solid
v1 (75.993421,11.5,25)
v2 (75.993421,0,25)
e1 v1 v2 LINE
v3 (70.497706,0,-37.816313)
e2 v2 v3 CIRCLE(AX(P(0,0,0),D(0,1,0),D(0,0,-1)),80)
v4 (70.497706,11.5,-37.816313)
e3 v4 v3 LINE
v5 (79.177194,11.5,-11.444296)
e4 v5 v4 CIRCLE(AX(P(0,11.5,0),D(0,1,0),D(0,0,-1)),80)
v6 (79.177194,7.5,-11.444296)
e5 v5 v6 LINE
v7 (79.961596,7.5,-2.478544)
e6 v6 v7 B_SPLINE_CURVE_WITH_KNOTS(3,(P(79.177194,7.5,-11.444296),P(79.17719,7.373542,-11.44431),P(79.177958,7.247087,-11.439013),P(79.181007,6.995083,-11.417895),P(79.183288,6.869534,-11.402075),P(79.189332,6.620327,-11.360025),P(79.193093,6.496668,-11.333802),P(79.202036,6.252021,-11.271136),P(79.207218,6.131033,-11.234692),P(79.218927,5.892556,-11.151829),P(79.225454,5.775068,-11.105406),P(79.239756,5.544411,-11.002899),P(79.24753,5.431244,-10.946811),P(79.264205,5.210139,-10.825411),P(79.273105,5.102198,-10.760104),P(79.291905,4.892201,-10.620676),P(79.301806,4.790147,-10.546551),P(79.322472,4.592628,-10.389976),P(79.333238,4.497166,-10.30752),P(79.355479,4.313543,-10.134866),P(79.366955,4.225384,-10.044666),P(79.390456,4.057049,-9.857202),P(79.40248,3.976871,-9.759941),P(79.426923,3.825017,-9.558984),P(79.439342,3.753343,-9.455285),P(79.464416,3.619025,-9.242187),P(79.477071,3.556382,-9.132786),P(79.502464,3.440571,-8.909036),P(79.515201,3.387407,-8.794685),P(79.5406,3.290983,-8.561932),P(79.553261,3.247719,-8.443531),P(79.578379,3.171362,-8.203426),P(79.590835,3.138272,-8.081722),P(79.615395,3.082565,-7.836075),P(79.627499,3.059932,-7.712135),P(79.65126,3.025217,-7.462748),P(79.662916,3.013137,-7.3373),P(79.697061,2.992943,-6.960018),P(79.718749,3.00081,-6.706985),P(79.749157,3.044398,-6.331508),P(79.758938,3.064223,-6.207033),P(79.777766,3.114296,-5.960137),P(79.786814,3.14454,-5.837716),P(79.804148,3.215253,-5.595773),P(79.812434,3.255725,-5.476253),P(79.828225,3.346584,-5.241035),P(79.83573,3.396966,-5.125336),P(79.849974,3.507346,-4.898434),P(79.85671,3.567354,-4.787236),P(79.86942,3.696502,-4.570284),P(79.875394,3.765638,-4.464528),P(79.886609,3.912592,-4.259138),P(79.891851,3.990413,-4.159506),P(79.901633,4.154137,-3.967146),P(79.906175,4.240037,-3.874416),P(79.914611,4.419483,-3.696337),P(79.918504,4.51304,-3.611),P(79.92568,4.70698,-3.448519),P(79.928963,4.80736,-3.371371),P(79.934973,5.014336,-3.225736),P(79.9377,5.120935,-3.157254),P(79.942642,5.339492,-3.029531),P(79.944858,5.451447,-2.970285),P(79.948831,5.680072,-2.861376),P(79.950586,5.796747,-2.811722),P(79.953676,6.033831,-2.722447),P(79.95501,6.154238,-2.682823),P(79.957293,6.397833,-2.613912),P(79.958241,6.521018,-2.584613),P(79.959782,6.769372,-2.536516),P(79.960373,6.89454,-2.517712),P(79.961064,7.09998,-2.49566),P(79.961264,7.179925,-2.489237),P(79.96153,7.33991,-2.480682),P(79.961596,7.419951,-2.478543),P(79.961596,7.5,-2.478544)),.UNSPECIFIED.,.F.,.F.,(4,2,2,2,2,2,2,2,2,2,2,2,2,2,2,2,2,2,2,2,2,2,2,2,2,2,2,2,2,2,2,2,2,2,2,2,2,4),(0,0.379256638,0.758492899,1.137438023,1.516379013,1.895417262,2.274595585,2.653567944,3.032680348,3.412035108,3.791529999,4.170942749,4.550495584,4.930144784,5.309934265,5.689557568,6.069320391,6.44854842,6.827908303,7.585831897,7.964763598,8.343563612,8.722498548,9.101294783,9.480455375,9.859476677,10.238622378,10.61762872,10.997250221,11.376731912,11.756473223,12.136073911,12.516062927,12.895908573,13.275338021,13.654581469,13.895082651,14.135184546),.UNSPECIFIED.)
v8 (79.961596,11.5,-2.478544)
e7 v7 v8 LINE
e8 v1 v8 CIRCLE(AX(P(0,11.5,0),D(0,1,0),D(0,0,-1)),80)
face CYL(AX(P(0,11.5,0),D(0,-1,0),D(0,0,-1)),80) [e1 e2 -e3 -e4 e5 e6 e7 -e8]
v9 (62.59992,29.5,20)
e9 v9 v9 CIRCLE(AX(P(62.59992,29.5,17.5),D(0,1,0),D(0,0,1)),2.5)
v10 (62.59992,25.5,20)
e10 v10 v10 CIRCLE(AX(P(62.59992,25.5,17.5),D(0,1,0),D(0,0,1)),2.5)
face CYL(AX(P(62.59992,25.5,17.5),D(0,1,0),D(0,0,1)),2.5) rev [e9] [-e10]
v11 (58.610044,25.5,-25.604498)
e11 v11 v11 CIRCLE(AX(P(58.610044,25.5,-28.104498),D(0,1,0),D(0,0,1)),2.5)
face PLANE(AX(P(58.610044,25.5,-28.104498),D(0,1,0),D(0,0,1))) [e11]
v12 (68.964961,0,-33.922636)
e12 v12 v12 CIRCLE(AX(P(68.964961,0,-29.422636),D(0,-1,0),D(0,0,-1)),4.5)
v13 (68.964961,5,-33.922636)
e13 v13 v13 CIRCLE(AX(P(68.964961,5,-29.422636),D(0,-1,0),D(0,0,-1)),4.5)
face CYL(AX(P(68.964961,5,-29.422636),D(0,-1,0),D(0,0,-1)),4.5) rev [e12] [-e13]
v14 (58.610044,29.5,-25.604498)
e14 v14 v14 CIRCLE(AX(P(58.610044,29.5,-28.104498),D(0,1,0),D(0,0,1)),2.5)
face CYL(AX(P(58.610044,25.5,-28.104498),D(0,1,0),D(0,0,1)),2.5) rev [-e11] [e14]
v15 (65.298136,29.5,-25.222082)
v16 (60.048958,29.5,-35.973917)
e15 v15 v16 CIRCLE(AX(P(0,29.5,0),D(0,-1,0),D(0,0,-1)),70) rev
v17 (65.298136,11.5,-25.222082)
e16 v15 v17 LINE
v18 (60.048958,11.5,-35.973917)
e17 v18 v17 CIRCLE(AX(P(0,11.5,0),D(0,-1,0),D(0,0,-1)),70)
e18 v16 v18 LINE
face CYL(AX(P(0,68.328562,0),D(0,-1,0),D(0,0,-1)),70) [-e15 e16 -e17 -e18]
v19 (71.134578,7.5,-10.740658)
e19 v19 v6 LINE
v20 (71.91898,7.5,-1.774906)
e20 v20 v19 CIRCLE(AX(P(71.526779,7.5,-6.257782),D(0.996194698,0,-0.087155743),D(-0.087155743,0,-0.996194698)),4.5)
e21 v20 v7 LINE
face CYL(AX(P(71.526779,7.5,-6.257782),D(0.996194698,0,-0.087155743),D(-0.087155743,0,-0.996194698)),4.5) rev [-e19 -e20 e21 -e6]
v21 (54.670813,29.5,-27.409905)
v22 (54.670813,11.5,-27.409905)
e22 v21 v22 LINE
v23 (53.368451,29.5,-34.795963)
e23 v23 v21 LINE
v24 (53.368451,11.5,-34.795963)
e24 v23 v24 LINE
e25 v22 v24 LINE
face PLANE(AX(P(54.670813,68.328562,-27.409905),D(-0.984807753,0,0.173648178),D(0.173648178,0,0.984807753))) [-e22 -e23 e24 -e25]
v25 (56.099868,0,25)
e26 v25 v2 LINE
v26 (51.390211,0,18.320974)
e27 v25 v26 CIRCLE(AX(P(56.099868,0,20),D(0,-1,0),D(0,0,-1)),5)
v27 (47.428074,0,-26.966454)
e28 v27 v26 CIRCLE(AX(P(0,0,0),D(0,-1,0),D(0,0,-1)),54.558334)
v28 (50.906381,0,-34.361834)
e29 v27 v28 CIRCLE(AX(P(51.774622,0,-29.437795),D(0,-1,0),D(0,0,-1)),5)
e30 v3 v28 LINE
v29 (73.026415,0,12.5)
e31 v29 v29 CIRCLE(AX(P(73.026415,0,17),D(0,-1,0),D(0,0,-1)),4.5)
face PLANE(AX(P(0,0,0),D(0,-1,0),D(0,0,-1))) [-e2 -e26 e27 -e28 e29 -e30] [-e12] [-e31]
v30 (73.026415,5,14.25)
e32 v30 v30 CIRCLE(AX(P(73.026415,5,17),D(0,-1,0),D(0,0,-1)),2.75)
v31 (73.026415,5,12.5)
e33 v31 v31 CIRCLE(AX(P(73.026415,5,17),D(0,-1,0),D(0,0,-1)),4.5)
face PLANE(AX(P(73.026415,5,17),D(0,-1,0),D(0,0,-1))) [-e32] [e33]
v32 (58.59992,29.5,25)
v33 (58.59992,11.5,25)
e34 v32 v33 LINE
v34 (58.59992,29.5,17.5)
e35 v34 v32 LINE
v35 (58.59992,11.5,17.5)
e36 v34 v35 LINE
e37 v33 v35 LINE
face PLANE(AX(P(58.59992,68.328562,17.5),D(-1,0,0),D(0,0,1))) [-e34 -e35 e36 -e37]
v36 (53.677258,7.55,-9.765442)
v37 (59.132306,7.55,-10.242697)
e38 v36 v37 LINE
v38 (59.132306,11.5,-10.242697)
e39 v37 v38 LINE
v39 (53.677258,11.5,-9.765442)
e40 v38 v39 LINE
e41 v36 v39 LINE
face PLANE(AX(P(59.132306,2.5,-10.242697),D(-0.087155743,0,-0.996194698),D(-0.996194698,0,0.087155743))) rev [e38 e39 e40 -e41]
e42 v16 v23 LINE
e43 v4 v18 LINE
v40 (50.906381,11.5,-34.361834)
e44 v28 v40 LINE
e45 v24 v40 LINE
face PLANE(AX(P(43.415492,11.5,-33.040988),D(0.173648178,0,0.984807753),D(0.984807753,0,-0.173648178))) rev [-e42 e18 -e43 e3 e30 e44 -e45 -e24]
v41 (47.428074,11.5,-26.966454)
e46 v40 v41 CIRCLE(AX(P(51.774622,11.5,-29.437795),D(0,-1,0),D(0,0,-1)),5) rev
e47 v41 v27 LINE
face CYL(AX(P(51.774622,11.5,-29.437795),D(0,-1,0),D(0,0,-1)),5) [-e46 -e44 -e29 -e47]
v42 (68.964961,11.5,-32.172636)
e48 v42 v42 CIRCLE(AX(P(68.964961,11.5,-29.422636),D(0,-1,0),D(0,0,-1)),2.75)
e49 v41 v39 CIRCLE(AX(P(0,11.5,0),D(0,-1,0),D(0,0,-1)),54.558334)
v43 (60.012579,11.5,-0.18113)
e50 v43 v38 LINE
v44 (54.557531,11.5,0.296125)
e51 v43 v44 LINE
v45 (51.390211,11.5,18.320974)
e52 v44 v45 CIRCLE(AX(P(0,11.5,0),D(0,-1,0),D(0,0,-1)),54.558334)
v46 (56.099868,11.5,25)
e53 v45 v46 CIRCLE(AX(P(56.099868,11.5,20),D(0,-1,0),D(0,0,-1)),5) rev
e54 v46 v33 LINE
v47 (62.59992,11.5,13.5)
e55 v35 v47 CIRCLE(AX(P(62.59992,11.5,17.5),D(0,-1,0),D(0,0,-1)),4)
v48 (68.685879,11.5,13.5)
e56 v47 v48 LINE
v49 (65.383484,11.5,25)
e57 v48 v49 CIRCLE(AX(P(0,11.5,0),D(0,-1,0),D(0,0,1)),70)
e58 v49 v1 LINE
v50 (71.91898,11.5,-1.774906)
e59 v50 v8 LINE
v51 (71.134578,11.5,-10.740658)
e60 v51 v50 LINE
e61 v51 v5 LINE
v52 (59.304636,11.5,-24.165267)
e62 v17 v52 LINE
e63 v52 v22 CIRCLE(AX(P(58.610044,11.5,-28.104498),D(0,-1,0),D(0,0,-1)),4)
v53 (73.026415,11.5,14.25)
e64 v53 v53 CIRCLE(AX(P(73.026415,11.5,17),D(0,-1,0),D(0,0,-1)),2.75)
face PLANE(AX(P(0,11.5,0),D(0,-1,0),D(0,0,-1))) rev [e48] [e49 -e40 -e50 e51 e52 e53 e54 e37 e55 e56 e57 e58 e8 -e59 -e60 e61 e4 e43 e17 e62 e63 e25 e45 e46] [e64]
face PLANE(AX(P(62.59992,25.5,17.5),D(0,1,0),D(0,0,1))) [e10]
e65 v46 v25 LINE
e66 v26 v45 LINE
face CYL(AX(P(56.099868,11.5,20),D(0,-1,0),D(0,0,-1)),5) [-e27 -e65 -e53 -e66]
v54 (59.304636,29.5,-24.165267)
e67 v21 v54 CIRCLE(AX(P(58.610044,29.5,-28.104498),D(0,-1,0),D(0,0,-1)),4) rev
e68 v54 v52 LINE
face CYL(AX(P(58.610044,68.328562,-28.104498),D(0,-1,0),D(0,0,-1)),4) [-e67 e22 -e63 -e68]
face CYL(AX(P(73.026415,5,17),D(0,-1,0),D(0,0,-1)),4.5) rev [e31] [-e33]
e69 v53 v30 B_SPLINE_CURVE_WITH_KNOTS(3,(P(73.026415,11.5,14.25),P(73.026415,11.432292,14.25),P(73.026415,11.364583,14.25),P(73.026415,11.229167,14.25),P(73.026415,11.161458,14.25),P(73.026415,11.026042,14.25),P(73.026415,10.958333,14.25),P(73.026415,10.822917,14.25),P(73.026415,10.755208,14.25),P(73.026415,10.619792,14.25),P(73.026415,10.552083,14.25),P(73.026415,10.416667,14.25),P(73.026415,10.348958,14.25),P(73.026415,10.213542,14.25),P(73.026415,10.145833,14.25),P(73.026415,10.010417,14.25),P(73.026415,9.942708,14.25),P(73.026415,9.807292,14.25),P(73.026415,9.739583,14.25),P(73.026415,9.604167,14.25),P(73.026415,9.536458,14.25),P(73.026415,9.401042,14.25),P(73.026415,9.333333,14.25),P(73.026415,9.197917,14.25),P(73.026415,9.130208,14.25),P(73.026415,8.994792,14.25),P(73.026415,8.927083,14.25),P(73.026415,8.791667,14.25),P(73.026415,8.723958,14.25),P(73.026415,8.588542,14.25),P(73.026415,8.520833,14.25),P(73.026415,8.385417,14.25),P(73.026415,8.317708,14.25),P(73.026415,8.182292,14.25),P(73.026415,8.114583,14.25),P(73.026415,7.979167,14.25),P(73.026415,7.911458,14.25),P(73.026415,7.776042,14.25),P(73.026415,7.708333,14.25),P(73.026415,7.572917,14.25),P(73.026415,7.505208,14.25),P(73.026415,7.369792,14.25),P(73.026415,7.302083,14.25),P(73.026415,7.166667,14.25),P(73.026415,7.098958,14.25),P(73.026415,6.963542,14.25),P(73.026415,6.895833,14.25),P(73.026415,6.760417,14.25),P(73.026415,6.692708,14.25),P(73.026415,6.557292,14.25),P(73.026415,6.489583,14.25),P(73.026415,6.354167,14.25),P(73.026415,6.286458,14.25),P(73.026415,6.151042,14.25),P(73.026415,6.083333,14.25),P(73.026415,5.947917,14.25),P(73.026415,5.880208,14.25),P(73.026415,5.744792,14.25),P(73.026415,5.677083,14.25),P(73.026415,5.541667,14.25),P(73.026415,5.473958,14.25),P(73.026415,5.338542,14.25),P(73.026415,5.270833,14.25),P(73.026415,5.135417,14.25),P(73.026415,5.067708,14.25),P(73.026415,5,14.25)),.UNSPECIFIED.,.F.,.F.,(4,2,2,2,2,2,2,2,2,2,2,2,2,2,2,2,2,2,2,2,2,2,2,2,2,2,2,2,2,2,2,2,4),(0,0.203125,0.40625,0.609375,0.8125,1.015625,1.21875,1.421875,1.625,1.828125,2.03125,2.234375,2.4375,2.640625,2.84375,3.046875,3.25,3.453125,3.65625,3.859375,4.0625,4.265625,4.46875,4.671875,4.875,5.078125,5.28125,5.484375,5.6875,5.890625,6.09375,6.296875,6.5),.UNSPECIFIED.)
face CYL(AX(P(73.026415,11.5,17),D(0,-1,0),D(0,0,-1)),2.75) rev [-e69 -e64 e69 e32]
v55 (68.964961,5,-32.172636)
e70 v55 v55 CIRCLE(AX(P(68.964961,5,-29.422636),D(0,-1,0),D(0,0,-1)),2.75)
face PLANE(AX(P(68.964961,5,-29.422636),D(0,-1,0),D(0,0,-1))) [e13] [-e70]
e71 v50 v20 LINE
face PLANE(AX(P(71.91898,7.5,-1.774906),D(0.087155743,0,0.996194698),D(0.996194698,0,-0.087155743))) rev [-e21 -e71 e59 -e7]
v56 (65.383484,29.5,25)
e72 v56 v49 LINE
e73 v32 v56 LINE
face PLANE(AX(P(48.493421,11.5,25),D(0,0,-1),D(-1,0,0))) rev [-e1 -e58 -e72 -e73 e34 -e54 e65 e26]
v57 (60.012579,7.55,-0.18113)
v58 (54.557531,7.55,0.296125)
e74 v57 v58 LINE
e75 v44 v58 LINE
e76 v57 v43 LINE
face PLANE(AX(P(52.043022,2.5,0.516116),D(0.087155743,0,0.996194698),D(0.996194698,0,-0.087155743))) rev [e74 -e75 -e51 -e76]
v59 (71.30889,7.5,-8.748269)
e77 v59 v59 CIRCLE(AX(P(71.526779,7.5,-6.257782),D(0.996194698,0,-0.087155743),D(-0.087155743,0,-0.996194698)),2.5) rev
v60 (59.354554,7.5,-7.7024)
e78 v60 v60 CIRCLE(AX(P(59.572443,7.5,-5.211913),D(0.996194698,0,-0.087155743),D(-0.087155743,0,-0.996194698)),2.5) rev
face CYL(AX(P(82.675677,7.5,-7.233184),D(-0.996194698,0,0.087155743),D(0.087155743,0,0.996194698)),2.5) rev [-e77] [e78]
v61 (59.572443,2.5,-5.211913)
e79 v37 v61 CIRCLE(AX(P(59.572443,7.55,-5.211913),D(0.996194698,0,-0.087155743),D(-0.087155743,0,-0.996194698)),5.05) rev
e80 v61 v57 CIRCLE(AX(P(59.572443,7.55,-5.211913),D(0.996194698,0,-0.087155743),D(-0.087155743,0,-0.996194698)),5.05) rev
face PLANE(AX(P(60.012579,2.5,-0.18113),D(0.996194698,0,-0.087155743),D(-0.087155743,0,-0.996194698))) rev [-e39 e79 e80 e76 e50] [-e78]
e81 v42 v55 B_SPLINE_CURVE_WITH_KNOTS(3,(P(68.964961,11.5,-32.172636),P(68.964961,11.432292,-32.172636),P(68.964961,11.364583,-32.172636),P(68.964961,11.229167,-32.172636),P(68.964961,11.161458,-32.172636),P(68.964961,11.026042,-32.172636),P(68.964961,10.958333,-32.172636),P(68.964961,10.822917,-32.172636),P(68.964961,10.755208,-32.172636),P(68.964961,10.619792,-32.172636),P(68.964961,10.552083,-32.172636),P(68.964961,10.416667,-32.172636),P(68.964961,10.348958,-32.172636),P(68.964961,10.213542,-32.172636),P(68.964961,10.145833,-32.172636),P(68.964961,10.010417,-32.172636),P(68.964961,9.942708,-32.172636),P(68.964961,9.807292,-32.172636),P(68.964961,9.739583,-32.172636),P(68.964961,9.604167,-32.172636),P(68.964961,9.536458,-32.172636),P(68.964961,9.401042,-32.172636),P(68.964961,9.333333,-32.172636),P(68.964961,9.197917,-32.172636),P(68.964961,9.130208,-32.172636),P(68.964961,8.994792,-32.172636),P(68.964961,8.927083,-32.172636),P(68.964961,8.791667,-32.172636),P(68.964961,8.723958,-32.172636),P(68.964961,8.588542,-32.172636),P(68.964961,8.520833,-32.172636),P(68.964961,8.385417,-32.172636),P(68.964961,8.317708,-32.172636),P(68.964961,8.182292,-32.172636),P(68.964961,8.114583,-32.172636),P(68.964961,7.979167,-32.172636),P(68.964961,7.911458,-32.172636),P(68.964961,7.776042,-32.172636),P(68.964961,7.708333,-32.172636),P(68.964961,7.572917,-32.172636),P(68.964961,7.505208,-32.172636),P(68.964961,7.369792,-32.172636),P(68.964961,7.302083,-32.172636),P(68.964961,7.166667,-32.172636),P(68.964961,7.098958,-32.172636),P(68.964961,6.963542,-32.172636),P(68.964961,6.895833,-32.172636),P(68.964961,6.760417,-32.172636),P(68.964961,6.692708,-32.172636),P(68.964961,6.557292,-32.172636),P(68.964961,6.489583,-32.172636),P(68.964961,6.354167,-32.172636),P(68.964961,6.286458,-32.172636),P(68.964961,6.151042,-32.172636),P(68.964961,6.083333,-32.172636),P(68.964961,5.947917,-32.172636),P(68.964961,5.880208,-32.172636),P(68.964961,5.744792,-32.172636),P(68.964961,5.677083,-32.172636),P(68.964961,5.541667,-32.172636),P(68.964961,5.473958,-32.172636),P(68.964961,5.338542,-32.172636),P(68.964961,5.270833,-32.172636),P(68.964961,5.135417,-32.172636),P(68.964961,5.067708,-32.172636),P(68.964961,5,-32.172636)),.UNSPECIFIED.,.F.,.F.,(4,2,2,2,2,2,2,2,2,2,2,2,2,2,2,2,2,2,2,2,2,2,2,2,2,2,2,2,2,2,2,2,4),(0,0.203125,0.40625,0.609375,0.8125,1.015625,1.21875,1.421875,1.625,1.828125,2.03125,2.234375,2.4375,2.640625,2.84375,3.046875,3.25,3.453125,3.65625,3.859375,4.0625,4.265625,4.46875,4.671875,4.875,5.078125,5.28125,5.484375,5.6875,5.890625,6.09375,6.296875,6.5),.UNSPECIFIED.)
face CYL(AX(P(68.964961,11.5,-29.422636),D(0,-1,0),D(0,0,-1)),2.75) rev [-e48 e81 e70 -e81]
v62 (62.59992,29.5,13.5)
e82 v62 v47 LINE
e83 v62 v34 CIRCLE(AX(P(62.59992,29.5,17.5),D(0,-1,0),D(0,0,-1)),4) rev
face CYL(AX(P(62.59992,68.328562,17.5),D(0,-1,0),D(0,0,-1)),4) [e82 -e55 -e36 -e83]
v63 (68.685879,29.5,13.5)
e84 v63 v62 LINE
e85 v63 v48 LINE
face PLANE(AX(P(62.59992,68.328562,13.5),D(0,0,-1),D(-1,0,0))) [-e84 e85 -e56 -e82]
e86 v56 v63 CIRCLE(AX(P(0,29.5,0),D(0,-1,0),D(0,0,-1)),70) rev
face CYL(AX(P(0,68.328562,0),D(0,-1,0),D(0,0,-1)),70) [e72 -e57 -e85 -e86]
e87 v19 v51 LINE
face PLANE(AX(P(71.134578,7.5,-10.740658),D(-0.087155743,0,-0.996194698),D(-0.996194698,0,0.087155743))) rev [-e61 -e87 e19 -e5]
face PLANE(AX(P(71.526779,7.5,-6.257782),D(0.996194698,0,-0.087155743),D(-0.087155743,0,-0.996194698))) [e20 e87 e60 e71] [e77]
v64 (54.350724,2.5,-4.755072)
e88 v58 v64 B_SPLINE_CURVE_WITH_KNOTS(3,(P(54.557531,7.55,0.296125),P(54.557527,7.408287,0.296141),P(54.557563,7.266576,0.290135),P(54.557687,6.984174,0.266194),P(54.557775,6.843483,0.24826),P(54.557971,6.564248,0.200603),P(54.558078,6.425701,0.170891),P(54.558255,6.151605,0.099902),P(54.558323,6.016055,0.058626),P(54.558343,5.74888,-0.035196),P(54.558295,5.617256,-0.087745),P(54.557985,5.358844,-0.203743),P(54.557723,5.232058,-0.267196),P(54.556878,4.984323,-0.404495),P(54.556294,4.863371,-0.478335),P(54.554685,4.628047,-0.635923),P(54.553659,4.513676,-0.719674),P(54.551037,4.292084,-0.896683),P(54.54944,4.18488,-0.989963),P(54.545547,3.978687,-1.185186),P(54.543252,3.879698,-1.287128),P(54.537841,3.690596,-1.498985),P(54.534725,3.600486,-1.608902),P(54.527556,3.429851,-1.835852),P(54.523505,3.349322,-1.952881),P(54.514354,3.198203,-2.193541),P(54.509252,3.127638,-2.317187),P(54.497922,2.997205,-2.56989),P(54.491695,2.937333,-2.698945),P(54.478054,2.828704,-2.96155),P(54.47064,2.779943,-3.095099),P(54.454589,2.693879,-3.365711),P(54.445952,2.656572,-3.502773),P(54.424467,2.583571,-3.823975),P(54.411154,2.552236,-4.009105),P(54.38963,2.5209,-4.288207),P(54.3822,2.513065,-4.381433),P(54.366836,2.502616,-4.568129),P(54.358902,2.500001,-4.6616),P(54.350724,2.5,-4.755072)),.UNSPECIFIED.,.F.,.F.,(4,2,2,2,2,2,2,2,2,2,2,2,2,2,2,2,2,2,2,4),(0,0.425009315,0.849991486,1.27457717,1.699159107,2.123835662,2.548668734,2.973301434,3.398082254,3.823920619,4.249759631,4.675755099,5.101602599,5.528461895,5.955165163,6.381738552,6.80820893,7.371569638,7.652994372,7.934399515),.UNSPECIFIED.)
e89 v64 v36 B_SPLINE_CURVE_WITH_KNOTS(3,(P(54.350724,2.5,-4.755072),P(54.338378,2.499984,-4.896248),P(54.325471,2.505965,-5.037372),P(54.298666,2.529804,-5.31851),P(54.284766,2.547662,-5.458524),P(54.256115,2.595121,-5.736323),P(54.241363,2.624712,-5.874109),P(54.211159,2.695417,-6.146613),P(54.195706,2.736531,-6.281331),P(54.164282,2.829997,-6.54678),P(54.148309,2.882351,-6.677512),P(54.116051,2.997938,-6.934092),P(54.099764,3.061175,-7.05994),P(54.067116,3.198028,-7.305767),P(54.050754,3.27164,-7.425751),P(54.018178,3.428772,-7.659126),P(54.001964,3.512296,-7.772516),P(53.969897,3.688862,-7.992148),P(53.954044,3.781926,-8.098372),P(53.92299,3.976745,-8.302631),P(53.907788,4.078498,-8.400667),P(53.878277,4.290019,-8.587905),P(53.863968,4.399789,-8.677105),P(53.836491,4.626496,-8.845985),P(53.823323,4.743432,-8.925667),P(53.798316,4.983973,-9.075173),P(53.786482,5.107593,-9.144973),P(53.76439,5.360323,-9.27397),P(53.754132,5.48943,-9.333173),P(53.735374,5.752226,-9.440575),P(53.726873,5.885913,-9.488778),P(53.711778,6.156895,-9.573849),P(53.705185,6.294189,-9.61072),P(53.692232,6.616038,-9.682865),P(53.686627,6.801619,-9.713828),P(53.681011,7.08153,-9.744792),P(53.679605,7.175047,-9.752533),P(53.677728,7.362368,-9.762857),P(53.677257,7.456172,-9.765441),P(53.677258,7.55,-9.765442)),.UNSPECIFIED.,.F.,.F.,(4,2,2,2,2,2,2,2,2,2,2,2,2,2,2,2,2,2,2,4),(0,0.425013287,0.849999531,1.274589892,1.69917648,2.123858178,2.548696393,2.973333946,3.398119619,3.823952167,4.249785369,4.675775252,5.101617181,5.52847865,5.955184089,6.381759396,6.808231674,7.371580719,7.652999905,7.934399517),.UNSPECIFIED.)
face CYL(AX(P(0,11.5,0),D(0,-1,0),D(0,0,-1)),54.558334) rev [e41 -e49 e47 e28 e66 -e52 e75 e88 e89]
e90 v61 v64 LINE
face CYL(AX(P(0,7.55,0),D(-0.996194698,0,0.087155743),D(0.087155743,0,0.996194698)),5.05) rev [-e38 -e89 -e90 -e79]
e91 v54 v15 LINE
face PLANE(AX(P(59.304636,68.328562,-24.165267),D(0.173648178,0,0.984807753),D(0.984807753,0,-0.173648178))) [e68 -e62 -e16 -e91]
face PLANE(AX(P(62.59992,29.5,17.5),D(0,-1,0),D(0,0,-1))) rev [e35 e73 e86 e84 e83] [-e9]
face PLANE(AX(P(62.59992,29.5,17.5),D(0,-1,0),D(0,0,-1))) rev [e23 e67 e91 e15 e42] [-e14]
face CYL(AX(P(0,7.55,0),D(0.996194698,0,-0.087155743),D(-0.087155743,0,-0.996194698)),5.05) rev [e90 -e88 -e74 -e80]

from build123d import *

# Parameters (mm, degrees)
BOSS_EXTRUDE1_DEPTH = 11.5
SKETCH4_R           = 4.5
CUT_EXTRUDE2_DEPTH  = 5
SKETCH5_R           = 2.75
CUT_EXTRUDE3_DEPTH  = 89.726115198
SKETCH6_R           = 2.5
CUT_EXTRUDE4_DEPTH  = 50.330582837
CUT_EXTRUDE5_DEPTH  = 8.2
CUT_EXTRUDE6_DEPTH  = 9
FILLET1_R           = 5.05
FILLET2_R           = 5
BOSS_EXTRUDE2_DEPTH = 18
SKETCH3_R           = 2.5
CUT_EXTRUDE1_DEPTH  = 4


with BuildPart() as part:
    # Sketch1 → Boss-Extrude1 (new body)
    with BuildSketch(Plane(origin=(0, 0, 0), x_dir=(1, 0, 0), z_dir=(0, 1, 0))):
        with BuildLine():
            Line((48.493420768, -25), (75.993420768, -25))
            ThreePointArc((75.993420768, -25), (79.695575847, 6.97245942), (70.497705508, 37.816312856))
            Line((70.497705508, 37.816312856), (43.415492301, 33.04098797))
            ThreePointArc((43.415492301, 33.04098797), (54.350723514, 4.755072162), (48.493420768, -25))
        make_face()
    extrude(amount=BOSS_EXTRUDE1_DEPTH)

    # Sketch4 → Cut-Extrude2 (cut)
    with BuildSketch(Plane.XZ):
        with Locations(Location((73.026415161, 17, 0), (0, 0, 270))):
            Circle(SKETCH4_R)
        with Locations(Location((68.964960805, -29.422635715, 0), (0, 0, 270))):
            Circle(SKETCH4_R)
    extrude(amount=-CUT_EXTRUDE2_DEPTH, mode=Mode.SUBTRACT)

    # Sketch5 → Cut-Extrude3 (cut, through all)
    with BuildSketch(Plane.XZ.offset(-5)):
        with Locations(Location((73.026415161, 17, 0), (0, 0, 270))):
            Circle(SKETCH5_R)
        with Locations(Location((68.964960805, -29.422635715, 0), (0, 0, 270))):
            Circle(SKETCH5_R)
    extrude(amount=-CUT_EXTRUDE3_DEPTH, mode=Mode.SUBTRACT)

    # Sketch6 → Cut-Extrude4 (cut, through all)
    with BuildSketch(Plane(origin=(45.954456534, 0, -4.020493985), x_dir=(0.08715574274765857, 0, 0.9961946980917455), z_dir=(-0.9961946980917455, 0, 0.08715574274765857))):
        with Locations((0, 7.5)):
            Circle(SKETCH6_R)
    extrude(amount=-CUT_EXTRUDE4_DEPTH, mode=Mode.SUBTRACT)

    # Sketch8 → Cut-Extrude5 (cut)
    with BuildSketch(Plane(origin=(79.695575847, 0, -6.97245942), x_dir=(-0.08715574274765857, 0, -0.9961946980917455), z_dir=(0.9961946980917455, 0, -0.08715574274765857))):
        with BuildLine():
            Line((-4.5, 7.5), (-4.5, 11.5))
            Line((-4.5, 11.5), (4.5, 11.5))
            Line((4.5, 11.5), (4.5, 7.5))
            ThreePointArc((4.5, 7.5), (0, 3), (-4.5, 7.5))
        make_face()
    extrude(amount=-CUT_EXTRUDE5_DEPTH, mode=Mode.SUBTRACT)

    # Sketch7 → Cut-Extrude6 (cut)
    with BuildSketch(Plane(origin=(0, 11.5, 0), x_dir=(1, 0, 0), z_dir=(0, 1, 0))):
        Polygon((51.16274886, 9.5454507), (52.043021862, -0.516115751), (60.012579447, 0.181130191), (59.132306445, 10.242696642), align=None)
    extrude(amount=-CUT_EXTRUDE6_DEPTH, mode=Mode.SUBTRACT)

    # Fillet1
    # the kernel refuses this fillet: 5.05 mm, written as the material it adds along each edge
    with BuildSketch(Plane(origin=(41.980572745, 2.5, 1.396465976), x_dir=(0, 1, 0), z_dir=(0.9961946980917454, 0, -0.08715574274765918))) as fillet1_piece_1_section:
        with BuildLine():
            CenterArc((FILLET1_R, -FILLET1_R), FILLET1_R, 90, 90)
            Line((0, -FILLET1_R), (0, 0))
            Line((0, 0), (FILLET1_R, 0))
        make_face()
    fillet1_piece_1 = extrude(amount=30.725886038, mode=Mode.PRIVATE)
    fillet1_piece_1 = fillet1_piece_1 - Plane(origin=(0, 3.651800065, 0), x_dir=(0.7957627874759549, 0, -0.6056084428642803), z_dir=(0, -1, 0)) * Cylinder(54.558334448, 82, mode=Mode.PRIVATE)
    add(fillet1_piece_1)
    with BuildSketch(Plane(origin=(71.709264508, 2.5, -11.343037894), x_dir=(0.08715574274765941, 0, 0.9961946980917454), z_dir=(-0.9961946980917455, 0, 0.08715574274765941))) as fillet1_piece_2_section:
        with BuildLine():
            CenterArc((FILLET1_R, FILLET1_R), FILLET1_R, 180, 90)
            Line((0, FILLET1_R), (0, 0))
            Line((0, 0), (FILLET1_R, 0))
        make_face()
    fillet1_piece_2 = extrude(amount=30.725886038, mode=Mode.PRIVATE)
    fillet1_piece_2 = fillet1_piece_2 - Plane(origin=(0, 3.643295327, 0), x_dir=(0.7957627874759549, 0, -0.6056084428642803), z_dir=(0, -1, 0)) * Cylinder(54.558334448, 82, mode=Mode.PRIVATE)
    add(fillet1_piece_2)

    # Fillet2
    fillet2_edges = [part.edges().sort_by_distance(p)[0] for p in [
        (48.493420768, 5.75, 25),
        (43.415492301, 5.75, -33.04098797),
    ]]
    fillet(fillet2_edges, radius=FILLET2_R)

    # Sketch2 → Boss-Extrude2 (add)
    with BuildSketch(Plane.XZ.offset(-11.5)):
        with BuildLine():
            Line((62.599920128, 13.5), (68.685879189, 13.5))
            ThreePointArc((68.685879189, 13.5), (67.280837144, 19.320687184), (65.383484153, 25))
            Line((65.383484153, 25), (58.599920128, 25))
            Line((58.599920128, 25), (58.599920128, 17.5))
            ThreePointArc((58.599920128, 17.5), (59.771493003, 14.671572875), (62.599920128, 13.5))
        make_face()
        with BuildLine():
            Line((54.670812559, -27.409905019), (53.368451226, -34.795963167))
            Line((53.368451226, -34.795963167), (60.048957671, -35.973916698))
            ThreePointArc((60.048957671, -35.973916698), (62.903687928, -30.710357294), (65.29813595, -25.222082418))
            Line((65.29813595, -25.222082418), (59.304636281, -24.165266718))
            ThreePointArc((59.304636281, -24.165266718), (56.315737825, -24.827889553), (54.670812559, -27.409905019))
        make_face()
    extrude(amount=-BOSS_EXTRUDE2_DEPTH)

    # Sketch3 → Cut-Extrude1 (cut)
    with BuildSketch(Plane(origin=(0, 29.5, 0), x_dir=(1, 0, 0), z_dir=(0, 1, 0))):
        with Locations(Location((58.610043571, 28.10449773, 0), (0, 0, 270))):
            Circle(SKETCH3_R)
        with Locations(Location((62.599920128, -17.5, 0), (0, 0, 270))):
            Circle(SKETCH3_R)
    extrude(amount=-CUT_EXTRUDE1_DEPTH, mode=Mode.SUBTRACT)


solid = part.part
